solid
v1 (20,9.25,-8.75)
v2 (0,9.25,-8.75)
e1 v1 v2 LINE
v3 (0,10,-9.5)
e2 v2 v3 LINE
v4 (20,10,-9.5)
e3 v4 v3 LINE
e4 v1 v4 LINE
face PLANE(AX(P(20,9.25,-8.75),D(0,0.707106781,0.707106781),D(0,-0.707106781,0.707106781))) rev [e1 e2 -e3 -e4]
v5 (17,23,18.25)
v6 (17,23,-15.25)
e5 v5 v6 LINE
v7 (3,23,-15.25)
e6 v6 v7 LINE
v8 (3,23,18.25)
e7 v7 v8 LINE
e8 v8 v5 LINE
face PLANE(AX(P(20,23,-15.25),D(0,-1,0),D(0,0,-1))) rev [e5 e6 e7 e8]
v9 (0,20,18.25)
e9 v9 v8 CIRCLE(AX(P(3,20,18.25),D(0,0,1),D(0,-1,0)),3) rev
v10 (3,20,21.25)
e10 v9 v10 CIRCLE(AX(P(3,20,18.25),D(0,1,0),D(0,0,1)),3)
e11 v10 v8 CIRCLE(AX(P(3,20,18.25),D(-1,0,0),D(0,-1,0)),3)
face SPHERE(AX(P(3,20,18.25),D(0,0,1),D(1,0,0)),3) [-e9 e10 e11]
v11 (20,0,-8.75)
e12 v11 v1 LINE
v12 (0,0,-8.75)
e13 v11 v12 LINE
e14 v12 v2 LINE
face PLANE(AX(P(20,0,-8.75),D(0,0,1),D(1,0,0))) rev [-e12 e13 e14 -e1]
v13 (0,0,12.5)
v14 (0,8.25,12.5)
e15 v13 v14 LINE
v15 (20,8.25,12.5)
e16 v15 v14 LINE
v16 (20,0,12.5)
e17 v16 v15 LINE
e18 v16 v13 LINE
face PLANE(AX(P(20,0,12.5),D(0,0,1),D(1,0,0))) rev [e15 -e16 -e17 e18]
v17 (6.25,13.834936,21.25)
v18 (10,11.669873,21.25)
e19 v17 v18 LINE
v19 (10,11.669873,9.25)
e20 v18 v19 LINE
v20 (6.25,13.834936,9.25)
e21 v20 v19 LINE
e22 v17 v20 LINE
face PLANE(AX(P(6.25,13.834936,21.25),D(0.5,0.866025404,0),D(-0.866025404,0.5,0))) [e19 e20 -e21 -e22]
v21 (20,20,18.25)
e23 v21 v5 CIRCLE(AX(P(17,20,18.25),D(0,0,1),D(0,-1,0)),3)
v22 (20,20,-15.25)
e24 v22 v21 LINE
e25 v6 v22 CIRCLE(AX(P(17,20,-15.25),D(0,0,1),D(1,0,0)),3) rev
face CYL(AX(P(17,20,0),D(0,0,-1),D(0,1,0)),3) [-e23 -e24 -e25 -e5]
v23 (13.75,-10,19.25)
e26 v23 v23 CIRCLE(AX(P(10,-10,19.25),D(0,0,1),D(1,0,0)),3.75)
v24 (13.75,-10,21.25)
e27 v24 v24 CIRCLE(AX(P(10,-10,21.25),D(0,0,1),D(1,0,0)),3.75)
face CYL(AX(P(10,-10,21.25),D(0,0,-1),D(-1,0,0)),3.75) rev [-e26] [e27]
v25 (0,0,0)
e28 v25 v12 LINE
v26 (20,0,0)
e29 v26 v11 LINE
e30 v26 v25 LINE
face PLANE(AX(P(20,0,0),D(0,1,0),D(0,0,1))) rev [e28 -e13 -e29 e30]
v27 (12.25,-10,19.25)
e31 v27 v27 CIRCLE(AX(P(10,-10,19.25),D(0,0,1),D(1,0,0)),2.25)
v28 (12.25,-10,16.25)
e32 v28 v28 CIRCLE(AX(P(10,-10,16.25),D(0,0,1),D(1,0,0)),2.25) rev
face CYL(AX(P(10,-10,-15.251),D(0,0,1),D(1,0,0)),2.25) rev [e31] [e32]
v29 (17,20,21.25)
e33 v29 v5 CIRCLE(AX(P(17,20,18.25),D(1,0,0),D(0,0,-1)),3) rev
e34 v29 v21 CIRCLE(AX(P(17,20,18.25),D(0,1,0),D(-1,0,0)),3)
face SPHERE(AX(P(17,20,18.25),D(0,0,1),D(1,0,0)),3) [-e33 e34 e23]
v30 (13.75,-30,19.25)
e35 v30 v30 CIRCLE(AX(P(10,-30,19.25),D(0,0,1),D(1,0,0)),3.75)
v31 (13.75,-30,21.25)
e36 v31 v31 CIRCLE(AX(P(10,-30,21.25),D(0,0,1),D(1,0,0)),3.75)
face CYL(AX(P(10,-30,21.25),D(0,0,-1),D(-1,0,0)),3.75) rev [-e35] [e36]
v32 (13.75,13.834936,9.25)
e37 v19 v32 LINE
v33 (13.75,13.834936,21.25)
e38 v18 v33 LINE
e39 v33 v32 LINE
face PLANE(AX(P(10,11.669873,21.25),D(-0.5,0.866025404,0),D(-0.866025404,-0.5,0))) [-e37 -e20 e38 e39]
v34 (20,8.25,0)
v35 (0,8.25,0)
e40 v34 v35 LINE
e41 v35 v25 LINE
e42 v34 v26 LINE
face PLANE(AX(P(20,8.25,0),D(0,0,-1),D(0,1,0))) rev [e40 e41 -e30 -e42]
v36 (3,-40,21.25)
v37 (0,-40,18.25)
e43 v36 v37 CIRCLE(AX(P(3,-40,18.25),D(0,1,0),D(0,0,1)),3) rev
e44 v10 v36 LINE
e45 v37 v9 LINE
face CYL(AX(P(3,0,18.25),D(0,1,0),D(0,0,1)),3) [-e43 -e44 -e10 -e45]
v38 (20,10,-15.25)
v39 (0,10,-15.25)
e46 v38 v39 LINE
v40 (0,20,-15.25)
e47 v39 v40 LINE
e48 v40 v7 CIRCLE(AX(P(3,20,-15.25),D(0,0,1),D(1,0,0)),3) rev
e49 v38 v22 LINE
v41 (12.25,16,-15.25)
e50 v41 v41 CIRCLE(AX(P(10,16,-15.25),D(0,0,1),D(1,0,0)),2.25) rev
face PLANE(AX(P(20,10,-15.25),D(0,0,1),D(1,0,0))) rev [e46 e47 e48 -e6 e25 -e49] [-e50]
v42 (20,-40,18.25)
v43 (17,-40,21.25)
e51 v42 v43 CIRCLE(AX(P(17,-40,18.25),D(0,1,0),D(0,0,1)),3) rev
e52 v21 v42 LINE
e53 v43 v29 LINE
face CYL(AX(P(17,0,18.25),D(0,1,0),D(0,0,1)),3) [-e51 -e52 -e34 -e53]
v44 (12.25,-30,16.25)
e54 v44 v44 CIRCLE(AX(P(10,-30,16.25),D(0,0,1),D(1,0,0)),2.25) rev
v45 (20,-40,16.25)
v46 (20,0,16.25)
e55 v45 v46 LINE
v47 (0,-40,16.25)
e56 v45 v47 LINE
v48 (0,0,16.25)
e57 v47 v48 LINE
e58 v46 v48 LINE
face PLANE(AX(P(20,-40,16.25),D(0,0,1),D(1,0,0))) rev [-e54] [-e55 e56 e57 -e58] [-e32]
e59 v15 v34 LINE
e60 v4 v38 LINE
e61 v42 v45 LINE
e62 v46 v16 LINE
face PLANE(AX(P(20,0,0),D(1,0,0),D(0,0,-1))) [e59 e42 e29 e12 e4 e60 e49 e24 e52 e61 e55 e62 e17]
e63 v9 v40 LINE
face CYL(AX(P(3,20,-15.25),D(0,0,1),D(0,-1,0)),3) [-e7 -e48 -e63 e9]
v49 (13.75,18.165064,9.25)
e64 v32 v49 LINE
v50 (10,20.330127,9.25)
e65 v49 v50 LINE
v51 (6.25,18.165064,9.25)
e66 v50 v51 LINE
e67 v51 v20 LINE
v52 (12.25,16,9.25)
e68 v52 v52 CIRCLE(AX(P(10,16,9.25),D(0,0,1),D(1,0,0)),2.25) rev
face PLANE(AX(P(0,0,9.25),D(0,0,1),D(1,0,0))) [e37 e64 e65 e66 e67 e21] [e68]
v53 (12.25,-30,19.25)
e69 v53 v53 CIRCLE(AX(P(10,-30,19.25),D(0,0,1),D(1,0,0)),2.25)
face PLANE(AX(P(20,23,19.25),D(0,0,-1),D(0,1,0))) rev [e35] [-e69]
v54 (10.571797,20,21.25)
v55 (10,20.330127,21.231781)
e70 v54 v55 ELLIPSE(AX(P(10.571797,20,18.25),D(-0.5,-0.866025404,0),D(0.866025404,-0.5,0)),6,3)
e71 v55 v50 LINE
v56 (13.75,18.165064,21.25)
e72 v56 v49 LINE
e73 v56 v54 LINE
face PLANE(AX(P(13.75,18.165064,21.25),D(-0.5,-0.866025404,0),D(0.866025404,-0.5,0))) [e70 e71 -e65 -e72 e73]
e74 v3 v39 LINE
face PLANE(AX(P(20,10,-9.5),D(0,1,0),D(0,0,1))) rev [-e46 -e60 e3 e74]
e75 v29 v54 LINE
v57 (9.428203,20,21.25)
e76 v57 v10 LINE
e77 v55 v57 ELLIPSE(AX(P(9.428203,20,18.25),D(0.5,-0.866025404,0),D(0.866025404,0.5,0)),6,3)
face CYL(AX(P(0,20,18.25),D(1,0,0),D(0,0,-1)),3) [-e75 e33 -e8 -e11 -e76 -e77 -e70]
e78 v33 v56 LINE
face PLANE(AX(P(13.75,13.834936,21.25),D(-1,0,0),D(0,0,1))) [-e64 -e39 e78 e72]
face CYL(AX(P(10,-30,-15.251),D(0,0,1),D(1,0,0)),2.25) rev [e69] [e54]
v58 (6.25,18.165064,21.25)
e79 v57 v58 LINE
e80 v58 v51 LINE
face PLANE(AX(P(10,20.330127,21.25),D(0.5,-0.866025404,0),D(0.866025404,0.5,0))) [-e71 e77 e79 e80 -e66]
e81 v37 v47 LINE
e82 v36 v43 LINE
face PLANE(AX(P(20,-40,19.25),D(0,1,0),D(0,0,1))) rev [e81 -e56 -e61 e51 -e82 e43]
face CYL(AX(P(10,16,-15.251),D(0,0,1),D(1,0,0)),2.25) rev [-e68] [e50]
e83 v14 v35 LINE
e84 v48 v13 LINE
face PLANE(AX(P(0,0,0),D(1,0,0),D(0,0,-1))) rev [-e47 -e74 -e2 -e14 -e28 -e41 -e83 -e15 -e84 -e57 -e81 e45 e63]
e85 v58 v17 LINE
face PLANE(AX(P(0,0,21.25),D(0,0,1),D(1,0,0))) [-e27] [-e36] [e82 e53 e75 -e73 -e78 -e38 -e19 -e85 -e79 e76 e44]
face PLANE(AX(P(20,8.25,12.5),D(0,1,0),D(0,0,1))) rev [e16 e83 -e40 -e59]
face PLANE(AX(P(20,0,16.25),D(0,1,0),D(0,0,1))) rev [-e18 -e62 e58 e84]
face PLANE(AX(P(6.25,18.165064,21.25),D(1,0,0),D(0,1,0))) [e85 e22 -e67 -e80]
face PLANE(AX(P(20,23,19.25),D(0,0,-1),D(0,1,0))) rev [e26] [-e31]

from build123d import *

# Parameters (mm, degrees)
BOSS_EXTRUDE1_DEPTH = 20
CUT_EXTRUDE1_REACH  = 58.482
SKETCH2_R           = 2.25
SKETCH3_W           = 20
SKETCH3_H           = 63
SKETCH3_R           = 3.75
BOSS_EXTRUDE2_DEPTH = 2
FILLET1_R           = 3
CUT_EXTRUDE2_DEPTH  = 10


with BuildPart() as part:
    # Sketch1 → Boss-Extrude1 (new body)
    with BuildSketch(Plane(origin=(0, 0, 0), x_dir=(0, 0, -1), z_dir=(1, 0, 0))):
        Polygon((8.75, 0), (8.75, 9.25), (9.5, 10), (15.25, 10), (15.25, 23), (-19.25, 23), (-19.25, -40), (-16.25, -40), (-16.25, 0), (-12.5, 0), (-12.5, 8.25), (0, 8.25), (0, 0), (3.75, 0), align=None)
    extrude(amount=BOSS_EXTRUDE1_DEPTH)

    # Sketch2 → Cut-Extrude1 (cut, up to next)
    with BuildSketch(Plane.XY.offset(19.25), mode=Mode.PRIVATE) as cut_extrude1_sk1:
        with Locations((10, -30)):
            Circle(SKETCH2_R)
    cut_extrude1_tool1 = extrude(cut_extrude1_sk1.sketch, amount=-CUT_EXTRUDE1_REACH, mode=Mode.PRIVATE) & part.part
    # Sketch2 → Cut-Extrude1 (cut, up to next)
    with BuildSketch(Plane.XY.offset(19.25), mode=Mode.PRIVATE) as cut_extrude1_sk2:
        with Locations((10, -10)):
            Circle(SKETCH2_R)
    cut_extrude1_tool2 = extrude(cut_extrude1_sk2.sketch, amount=-CUT_EXTRUDE1_REACH, mode=Mode.PRIVATE) & part.part
    # Sketch2 → Cut-Extrude1 (cut, up to next)
    with BuildSketch(Plane.XY.offset(19.25), mode=Mode.PRIVATE) as cut_extrude1_sk3:
        with Locations((10, 16)):
            Circle(SKETCH2_R)
    cut_extrude1_tool3 = extrude(cut_extrude1_sk3.sketch, amount=-CUT_EXTRUDE1_REACH, mode=Mode.PRIVATE) & part.part
    add(cut_extrude1_tool1.solids().sort_by_distance((10, -30, 19.25))[0], mode=Mode.SUBTRACT)
    add(cut_extrude1_tool2.solids().sort_by_distance((10, -10, 19.25))[0], mode=Mode.SUBTRACT)
    add(cut_extrude1_tool3.solids().sort_by_distance((10, 16, 19.25))[0], mode=Mode.SUBTRACT)

    # Sketch3 → Boss-Extrude2 (add)
    with BuildSketch(Plane.XY.offset(19.25)):
        with Locations((10, -8.5)):
            Rectangle(SKETCH3_W, SKETCH3_H)
        with Locations((10, -30)):
            Circle(SKETCH3_R, mode=Mode.SUBTRACT)
        with Locations((10, -10)):
            Circle(SKETCH3_R, mode=Mode.SUBTRACT)
        Polygon((13.75, 18.165063509), (10, 20.330127019), (6.25, 18.165063509), (6.25, 13.834936491), (10, 11.669872981), (13.75, 13.834936491), align=None, mode=Mode.SUBTRACT)
    extrude(amount=BOSS_EXTRUDE2_DEPTH)

    # Fillet1
    # the kernel refuses this fillet: 3 mm, written as the material it takes off along each edge
    with BuildSketch(Plane(origin=(3, 20, 18.25), x_dir=(0, 0, 1), z_dir=(-1, 0, 0))) as fillet1_piece_1_section:
        Polygon((0, 0), (FILLET1_R, 0), (FILLET1_R, FILLET1_R), (0, FILLET1_R), align=None)
    fillet1_piece_1 = extrude(amount=FILLET1_R, mode=Mode.PRIVATE)
    fillet1_piece_1 = fillet1_piece_1 - Plane(origin=(3, 20, 18.25), x_dir=(0, -0.7071067811865485, -0.7071067811865465), z_dir=(-1, 0, 0)) * Sphere(FILLET1_R, mode=Mode.PRIVATE)
    add(fillet1_piece_1, mode=Mode.SUBTRACT)
    with BuildSketch(Plane(origin=(17, 20, 18.25), x_dir=(0, 0, 1), z_dir=(1, 0, 0))) as fillet1_piece_2_section:
        Polygon((0, 0), (FILLET1_R, 0), (FILLET1_R, -FILLET1_R), (0, -FILLET1_R), align=None)
    fillet1_piece_2 = extrude(amount=FILLET1_R, mode=Mode.PRIVATE)
    fillet1_piece_2 = fillet1_piece_2 - Plane(origin=(17, 20, 18.25), x_dir=(0, -0.7071067811865485, -0.7071067811865465), z_dir=(1, 0, 0)) * Sphere(FILLET1_R, mode=Mode.PRIVATE)
    add(fillet1_piece_2, mode=Mode.SUBTRACT)
    with BuildSketch(Plane(origin=(0, 23, 18.25), x_dir=(1, 0, 0), z_dir=(0, 0, -1))) as fillet1_piece_3:
        with BuildLine():
            CenterArc((FILLET1_R, FILLET1_R), FILLET1_R, 180, 90)
            Line((0, FILLET1_R), (0, 0))
            Line((0, 0), (FILLET1_R, 0))
        make_face()
    extrude(amount=41, mode=Mode.SUBTRACT)
    with BuildSketch(Plane(origin=(20, 23, -22.75), x_dir=(0, -1, 0), z_dir=(0, 0, 1))) as fillet1_piece_4:
        with BuildLine():
            CenterArc((FILLET1_R, -FILLET1_R), FILLET1_R, 90, 90)
            Line((0, -FILLET1_R), (0, 0))
            Line((0, 0), (FILLET1_R, 0))
        make_face()
    extrude(amount=41, mode=Mode.SUBTRACT)
    with BuildSketch(Plane(origin=(17, 23, 21.25), x_dir=(0, -1, 0), z_dir=(-1, 0, 0))) as fillet1_piece_5:
        with BuildLine():
            CenterArc((FILLET1_R, -FILLET1_R), FILLET1_R, 90, 90)
            Line((0, -FILLET1_R), (0, 0))
            Line((0, 0), (FILLET1_R, 0))
        make_face()
    extrude(amount=14, mode=Mode.SUBTRACT)
    with BuildSketch(Plane(origin=(0, 20, 21.25), x_dir=(1, 0, 0), z_dir=(0, -1, 0))) as fillet1_piece_6:
        with BuildLine():
            CenterArc((FILLET1_R, -FILLET1_R), FILLET1_R, 90, 90)
            Line((0, -FILLET1_R), (0, 0))
            Line((0, 0), (FILLET1_R, 0))
        make_face()
    extrude(amount=67.5, mode=Mode.SUBTRACT)
    with BuildSketch(Plane(origin=(20, -47.5, 21.25), x_dir=(0, 0, -1), z_dir=(0, 1, 0))) as fillet1_piece_7:
        with BuildLine():
            CenterArc((FILLET1_R, FILLET1_R), FILLET1_R, 180, 90)
            Line((0, FILLET1_R), (0, 0))
            Line((0, 0), (FILLET1_R, 0))
        make_face()
    extrude(amount=67.5, mode=Mode.SUBTRACT)

    # Sketch4 → Cut-Extrude2 (cut)
    with BuildSketch(Plane.XY.offset(19.25)):
        Polygon((10, 11.669872981), (13.75, 13.834936491), (13.75, 18.165063509), (10, 20.330127019), (6.25, 18.165063509), (6.25, 13.834936491), align=None)
    extrude(amount=-CUT_EXTRUDE2_DEPTH, mode=Mode.SUBTRACT)


solid = part.part
